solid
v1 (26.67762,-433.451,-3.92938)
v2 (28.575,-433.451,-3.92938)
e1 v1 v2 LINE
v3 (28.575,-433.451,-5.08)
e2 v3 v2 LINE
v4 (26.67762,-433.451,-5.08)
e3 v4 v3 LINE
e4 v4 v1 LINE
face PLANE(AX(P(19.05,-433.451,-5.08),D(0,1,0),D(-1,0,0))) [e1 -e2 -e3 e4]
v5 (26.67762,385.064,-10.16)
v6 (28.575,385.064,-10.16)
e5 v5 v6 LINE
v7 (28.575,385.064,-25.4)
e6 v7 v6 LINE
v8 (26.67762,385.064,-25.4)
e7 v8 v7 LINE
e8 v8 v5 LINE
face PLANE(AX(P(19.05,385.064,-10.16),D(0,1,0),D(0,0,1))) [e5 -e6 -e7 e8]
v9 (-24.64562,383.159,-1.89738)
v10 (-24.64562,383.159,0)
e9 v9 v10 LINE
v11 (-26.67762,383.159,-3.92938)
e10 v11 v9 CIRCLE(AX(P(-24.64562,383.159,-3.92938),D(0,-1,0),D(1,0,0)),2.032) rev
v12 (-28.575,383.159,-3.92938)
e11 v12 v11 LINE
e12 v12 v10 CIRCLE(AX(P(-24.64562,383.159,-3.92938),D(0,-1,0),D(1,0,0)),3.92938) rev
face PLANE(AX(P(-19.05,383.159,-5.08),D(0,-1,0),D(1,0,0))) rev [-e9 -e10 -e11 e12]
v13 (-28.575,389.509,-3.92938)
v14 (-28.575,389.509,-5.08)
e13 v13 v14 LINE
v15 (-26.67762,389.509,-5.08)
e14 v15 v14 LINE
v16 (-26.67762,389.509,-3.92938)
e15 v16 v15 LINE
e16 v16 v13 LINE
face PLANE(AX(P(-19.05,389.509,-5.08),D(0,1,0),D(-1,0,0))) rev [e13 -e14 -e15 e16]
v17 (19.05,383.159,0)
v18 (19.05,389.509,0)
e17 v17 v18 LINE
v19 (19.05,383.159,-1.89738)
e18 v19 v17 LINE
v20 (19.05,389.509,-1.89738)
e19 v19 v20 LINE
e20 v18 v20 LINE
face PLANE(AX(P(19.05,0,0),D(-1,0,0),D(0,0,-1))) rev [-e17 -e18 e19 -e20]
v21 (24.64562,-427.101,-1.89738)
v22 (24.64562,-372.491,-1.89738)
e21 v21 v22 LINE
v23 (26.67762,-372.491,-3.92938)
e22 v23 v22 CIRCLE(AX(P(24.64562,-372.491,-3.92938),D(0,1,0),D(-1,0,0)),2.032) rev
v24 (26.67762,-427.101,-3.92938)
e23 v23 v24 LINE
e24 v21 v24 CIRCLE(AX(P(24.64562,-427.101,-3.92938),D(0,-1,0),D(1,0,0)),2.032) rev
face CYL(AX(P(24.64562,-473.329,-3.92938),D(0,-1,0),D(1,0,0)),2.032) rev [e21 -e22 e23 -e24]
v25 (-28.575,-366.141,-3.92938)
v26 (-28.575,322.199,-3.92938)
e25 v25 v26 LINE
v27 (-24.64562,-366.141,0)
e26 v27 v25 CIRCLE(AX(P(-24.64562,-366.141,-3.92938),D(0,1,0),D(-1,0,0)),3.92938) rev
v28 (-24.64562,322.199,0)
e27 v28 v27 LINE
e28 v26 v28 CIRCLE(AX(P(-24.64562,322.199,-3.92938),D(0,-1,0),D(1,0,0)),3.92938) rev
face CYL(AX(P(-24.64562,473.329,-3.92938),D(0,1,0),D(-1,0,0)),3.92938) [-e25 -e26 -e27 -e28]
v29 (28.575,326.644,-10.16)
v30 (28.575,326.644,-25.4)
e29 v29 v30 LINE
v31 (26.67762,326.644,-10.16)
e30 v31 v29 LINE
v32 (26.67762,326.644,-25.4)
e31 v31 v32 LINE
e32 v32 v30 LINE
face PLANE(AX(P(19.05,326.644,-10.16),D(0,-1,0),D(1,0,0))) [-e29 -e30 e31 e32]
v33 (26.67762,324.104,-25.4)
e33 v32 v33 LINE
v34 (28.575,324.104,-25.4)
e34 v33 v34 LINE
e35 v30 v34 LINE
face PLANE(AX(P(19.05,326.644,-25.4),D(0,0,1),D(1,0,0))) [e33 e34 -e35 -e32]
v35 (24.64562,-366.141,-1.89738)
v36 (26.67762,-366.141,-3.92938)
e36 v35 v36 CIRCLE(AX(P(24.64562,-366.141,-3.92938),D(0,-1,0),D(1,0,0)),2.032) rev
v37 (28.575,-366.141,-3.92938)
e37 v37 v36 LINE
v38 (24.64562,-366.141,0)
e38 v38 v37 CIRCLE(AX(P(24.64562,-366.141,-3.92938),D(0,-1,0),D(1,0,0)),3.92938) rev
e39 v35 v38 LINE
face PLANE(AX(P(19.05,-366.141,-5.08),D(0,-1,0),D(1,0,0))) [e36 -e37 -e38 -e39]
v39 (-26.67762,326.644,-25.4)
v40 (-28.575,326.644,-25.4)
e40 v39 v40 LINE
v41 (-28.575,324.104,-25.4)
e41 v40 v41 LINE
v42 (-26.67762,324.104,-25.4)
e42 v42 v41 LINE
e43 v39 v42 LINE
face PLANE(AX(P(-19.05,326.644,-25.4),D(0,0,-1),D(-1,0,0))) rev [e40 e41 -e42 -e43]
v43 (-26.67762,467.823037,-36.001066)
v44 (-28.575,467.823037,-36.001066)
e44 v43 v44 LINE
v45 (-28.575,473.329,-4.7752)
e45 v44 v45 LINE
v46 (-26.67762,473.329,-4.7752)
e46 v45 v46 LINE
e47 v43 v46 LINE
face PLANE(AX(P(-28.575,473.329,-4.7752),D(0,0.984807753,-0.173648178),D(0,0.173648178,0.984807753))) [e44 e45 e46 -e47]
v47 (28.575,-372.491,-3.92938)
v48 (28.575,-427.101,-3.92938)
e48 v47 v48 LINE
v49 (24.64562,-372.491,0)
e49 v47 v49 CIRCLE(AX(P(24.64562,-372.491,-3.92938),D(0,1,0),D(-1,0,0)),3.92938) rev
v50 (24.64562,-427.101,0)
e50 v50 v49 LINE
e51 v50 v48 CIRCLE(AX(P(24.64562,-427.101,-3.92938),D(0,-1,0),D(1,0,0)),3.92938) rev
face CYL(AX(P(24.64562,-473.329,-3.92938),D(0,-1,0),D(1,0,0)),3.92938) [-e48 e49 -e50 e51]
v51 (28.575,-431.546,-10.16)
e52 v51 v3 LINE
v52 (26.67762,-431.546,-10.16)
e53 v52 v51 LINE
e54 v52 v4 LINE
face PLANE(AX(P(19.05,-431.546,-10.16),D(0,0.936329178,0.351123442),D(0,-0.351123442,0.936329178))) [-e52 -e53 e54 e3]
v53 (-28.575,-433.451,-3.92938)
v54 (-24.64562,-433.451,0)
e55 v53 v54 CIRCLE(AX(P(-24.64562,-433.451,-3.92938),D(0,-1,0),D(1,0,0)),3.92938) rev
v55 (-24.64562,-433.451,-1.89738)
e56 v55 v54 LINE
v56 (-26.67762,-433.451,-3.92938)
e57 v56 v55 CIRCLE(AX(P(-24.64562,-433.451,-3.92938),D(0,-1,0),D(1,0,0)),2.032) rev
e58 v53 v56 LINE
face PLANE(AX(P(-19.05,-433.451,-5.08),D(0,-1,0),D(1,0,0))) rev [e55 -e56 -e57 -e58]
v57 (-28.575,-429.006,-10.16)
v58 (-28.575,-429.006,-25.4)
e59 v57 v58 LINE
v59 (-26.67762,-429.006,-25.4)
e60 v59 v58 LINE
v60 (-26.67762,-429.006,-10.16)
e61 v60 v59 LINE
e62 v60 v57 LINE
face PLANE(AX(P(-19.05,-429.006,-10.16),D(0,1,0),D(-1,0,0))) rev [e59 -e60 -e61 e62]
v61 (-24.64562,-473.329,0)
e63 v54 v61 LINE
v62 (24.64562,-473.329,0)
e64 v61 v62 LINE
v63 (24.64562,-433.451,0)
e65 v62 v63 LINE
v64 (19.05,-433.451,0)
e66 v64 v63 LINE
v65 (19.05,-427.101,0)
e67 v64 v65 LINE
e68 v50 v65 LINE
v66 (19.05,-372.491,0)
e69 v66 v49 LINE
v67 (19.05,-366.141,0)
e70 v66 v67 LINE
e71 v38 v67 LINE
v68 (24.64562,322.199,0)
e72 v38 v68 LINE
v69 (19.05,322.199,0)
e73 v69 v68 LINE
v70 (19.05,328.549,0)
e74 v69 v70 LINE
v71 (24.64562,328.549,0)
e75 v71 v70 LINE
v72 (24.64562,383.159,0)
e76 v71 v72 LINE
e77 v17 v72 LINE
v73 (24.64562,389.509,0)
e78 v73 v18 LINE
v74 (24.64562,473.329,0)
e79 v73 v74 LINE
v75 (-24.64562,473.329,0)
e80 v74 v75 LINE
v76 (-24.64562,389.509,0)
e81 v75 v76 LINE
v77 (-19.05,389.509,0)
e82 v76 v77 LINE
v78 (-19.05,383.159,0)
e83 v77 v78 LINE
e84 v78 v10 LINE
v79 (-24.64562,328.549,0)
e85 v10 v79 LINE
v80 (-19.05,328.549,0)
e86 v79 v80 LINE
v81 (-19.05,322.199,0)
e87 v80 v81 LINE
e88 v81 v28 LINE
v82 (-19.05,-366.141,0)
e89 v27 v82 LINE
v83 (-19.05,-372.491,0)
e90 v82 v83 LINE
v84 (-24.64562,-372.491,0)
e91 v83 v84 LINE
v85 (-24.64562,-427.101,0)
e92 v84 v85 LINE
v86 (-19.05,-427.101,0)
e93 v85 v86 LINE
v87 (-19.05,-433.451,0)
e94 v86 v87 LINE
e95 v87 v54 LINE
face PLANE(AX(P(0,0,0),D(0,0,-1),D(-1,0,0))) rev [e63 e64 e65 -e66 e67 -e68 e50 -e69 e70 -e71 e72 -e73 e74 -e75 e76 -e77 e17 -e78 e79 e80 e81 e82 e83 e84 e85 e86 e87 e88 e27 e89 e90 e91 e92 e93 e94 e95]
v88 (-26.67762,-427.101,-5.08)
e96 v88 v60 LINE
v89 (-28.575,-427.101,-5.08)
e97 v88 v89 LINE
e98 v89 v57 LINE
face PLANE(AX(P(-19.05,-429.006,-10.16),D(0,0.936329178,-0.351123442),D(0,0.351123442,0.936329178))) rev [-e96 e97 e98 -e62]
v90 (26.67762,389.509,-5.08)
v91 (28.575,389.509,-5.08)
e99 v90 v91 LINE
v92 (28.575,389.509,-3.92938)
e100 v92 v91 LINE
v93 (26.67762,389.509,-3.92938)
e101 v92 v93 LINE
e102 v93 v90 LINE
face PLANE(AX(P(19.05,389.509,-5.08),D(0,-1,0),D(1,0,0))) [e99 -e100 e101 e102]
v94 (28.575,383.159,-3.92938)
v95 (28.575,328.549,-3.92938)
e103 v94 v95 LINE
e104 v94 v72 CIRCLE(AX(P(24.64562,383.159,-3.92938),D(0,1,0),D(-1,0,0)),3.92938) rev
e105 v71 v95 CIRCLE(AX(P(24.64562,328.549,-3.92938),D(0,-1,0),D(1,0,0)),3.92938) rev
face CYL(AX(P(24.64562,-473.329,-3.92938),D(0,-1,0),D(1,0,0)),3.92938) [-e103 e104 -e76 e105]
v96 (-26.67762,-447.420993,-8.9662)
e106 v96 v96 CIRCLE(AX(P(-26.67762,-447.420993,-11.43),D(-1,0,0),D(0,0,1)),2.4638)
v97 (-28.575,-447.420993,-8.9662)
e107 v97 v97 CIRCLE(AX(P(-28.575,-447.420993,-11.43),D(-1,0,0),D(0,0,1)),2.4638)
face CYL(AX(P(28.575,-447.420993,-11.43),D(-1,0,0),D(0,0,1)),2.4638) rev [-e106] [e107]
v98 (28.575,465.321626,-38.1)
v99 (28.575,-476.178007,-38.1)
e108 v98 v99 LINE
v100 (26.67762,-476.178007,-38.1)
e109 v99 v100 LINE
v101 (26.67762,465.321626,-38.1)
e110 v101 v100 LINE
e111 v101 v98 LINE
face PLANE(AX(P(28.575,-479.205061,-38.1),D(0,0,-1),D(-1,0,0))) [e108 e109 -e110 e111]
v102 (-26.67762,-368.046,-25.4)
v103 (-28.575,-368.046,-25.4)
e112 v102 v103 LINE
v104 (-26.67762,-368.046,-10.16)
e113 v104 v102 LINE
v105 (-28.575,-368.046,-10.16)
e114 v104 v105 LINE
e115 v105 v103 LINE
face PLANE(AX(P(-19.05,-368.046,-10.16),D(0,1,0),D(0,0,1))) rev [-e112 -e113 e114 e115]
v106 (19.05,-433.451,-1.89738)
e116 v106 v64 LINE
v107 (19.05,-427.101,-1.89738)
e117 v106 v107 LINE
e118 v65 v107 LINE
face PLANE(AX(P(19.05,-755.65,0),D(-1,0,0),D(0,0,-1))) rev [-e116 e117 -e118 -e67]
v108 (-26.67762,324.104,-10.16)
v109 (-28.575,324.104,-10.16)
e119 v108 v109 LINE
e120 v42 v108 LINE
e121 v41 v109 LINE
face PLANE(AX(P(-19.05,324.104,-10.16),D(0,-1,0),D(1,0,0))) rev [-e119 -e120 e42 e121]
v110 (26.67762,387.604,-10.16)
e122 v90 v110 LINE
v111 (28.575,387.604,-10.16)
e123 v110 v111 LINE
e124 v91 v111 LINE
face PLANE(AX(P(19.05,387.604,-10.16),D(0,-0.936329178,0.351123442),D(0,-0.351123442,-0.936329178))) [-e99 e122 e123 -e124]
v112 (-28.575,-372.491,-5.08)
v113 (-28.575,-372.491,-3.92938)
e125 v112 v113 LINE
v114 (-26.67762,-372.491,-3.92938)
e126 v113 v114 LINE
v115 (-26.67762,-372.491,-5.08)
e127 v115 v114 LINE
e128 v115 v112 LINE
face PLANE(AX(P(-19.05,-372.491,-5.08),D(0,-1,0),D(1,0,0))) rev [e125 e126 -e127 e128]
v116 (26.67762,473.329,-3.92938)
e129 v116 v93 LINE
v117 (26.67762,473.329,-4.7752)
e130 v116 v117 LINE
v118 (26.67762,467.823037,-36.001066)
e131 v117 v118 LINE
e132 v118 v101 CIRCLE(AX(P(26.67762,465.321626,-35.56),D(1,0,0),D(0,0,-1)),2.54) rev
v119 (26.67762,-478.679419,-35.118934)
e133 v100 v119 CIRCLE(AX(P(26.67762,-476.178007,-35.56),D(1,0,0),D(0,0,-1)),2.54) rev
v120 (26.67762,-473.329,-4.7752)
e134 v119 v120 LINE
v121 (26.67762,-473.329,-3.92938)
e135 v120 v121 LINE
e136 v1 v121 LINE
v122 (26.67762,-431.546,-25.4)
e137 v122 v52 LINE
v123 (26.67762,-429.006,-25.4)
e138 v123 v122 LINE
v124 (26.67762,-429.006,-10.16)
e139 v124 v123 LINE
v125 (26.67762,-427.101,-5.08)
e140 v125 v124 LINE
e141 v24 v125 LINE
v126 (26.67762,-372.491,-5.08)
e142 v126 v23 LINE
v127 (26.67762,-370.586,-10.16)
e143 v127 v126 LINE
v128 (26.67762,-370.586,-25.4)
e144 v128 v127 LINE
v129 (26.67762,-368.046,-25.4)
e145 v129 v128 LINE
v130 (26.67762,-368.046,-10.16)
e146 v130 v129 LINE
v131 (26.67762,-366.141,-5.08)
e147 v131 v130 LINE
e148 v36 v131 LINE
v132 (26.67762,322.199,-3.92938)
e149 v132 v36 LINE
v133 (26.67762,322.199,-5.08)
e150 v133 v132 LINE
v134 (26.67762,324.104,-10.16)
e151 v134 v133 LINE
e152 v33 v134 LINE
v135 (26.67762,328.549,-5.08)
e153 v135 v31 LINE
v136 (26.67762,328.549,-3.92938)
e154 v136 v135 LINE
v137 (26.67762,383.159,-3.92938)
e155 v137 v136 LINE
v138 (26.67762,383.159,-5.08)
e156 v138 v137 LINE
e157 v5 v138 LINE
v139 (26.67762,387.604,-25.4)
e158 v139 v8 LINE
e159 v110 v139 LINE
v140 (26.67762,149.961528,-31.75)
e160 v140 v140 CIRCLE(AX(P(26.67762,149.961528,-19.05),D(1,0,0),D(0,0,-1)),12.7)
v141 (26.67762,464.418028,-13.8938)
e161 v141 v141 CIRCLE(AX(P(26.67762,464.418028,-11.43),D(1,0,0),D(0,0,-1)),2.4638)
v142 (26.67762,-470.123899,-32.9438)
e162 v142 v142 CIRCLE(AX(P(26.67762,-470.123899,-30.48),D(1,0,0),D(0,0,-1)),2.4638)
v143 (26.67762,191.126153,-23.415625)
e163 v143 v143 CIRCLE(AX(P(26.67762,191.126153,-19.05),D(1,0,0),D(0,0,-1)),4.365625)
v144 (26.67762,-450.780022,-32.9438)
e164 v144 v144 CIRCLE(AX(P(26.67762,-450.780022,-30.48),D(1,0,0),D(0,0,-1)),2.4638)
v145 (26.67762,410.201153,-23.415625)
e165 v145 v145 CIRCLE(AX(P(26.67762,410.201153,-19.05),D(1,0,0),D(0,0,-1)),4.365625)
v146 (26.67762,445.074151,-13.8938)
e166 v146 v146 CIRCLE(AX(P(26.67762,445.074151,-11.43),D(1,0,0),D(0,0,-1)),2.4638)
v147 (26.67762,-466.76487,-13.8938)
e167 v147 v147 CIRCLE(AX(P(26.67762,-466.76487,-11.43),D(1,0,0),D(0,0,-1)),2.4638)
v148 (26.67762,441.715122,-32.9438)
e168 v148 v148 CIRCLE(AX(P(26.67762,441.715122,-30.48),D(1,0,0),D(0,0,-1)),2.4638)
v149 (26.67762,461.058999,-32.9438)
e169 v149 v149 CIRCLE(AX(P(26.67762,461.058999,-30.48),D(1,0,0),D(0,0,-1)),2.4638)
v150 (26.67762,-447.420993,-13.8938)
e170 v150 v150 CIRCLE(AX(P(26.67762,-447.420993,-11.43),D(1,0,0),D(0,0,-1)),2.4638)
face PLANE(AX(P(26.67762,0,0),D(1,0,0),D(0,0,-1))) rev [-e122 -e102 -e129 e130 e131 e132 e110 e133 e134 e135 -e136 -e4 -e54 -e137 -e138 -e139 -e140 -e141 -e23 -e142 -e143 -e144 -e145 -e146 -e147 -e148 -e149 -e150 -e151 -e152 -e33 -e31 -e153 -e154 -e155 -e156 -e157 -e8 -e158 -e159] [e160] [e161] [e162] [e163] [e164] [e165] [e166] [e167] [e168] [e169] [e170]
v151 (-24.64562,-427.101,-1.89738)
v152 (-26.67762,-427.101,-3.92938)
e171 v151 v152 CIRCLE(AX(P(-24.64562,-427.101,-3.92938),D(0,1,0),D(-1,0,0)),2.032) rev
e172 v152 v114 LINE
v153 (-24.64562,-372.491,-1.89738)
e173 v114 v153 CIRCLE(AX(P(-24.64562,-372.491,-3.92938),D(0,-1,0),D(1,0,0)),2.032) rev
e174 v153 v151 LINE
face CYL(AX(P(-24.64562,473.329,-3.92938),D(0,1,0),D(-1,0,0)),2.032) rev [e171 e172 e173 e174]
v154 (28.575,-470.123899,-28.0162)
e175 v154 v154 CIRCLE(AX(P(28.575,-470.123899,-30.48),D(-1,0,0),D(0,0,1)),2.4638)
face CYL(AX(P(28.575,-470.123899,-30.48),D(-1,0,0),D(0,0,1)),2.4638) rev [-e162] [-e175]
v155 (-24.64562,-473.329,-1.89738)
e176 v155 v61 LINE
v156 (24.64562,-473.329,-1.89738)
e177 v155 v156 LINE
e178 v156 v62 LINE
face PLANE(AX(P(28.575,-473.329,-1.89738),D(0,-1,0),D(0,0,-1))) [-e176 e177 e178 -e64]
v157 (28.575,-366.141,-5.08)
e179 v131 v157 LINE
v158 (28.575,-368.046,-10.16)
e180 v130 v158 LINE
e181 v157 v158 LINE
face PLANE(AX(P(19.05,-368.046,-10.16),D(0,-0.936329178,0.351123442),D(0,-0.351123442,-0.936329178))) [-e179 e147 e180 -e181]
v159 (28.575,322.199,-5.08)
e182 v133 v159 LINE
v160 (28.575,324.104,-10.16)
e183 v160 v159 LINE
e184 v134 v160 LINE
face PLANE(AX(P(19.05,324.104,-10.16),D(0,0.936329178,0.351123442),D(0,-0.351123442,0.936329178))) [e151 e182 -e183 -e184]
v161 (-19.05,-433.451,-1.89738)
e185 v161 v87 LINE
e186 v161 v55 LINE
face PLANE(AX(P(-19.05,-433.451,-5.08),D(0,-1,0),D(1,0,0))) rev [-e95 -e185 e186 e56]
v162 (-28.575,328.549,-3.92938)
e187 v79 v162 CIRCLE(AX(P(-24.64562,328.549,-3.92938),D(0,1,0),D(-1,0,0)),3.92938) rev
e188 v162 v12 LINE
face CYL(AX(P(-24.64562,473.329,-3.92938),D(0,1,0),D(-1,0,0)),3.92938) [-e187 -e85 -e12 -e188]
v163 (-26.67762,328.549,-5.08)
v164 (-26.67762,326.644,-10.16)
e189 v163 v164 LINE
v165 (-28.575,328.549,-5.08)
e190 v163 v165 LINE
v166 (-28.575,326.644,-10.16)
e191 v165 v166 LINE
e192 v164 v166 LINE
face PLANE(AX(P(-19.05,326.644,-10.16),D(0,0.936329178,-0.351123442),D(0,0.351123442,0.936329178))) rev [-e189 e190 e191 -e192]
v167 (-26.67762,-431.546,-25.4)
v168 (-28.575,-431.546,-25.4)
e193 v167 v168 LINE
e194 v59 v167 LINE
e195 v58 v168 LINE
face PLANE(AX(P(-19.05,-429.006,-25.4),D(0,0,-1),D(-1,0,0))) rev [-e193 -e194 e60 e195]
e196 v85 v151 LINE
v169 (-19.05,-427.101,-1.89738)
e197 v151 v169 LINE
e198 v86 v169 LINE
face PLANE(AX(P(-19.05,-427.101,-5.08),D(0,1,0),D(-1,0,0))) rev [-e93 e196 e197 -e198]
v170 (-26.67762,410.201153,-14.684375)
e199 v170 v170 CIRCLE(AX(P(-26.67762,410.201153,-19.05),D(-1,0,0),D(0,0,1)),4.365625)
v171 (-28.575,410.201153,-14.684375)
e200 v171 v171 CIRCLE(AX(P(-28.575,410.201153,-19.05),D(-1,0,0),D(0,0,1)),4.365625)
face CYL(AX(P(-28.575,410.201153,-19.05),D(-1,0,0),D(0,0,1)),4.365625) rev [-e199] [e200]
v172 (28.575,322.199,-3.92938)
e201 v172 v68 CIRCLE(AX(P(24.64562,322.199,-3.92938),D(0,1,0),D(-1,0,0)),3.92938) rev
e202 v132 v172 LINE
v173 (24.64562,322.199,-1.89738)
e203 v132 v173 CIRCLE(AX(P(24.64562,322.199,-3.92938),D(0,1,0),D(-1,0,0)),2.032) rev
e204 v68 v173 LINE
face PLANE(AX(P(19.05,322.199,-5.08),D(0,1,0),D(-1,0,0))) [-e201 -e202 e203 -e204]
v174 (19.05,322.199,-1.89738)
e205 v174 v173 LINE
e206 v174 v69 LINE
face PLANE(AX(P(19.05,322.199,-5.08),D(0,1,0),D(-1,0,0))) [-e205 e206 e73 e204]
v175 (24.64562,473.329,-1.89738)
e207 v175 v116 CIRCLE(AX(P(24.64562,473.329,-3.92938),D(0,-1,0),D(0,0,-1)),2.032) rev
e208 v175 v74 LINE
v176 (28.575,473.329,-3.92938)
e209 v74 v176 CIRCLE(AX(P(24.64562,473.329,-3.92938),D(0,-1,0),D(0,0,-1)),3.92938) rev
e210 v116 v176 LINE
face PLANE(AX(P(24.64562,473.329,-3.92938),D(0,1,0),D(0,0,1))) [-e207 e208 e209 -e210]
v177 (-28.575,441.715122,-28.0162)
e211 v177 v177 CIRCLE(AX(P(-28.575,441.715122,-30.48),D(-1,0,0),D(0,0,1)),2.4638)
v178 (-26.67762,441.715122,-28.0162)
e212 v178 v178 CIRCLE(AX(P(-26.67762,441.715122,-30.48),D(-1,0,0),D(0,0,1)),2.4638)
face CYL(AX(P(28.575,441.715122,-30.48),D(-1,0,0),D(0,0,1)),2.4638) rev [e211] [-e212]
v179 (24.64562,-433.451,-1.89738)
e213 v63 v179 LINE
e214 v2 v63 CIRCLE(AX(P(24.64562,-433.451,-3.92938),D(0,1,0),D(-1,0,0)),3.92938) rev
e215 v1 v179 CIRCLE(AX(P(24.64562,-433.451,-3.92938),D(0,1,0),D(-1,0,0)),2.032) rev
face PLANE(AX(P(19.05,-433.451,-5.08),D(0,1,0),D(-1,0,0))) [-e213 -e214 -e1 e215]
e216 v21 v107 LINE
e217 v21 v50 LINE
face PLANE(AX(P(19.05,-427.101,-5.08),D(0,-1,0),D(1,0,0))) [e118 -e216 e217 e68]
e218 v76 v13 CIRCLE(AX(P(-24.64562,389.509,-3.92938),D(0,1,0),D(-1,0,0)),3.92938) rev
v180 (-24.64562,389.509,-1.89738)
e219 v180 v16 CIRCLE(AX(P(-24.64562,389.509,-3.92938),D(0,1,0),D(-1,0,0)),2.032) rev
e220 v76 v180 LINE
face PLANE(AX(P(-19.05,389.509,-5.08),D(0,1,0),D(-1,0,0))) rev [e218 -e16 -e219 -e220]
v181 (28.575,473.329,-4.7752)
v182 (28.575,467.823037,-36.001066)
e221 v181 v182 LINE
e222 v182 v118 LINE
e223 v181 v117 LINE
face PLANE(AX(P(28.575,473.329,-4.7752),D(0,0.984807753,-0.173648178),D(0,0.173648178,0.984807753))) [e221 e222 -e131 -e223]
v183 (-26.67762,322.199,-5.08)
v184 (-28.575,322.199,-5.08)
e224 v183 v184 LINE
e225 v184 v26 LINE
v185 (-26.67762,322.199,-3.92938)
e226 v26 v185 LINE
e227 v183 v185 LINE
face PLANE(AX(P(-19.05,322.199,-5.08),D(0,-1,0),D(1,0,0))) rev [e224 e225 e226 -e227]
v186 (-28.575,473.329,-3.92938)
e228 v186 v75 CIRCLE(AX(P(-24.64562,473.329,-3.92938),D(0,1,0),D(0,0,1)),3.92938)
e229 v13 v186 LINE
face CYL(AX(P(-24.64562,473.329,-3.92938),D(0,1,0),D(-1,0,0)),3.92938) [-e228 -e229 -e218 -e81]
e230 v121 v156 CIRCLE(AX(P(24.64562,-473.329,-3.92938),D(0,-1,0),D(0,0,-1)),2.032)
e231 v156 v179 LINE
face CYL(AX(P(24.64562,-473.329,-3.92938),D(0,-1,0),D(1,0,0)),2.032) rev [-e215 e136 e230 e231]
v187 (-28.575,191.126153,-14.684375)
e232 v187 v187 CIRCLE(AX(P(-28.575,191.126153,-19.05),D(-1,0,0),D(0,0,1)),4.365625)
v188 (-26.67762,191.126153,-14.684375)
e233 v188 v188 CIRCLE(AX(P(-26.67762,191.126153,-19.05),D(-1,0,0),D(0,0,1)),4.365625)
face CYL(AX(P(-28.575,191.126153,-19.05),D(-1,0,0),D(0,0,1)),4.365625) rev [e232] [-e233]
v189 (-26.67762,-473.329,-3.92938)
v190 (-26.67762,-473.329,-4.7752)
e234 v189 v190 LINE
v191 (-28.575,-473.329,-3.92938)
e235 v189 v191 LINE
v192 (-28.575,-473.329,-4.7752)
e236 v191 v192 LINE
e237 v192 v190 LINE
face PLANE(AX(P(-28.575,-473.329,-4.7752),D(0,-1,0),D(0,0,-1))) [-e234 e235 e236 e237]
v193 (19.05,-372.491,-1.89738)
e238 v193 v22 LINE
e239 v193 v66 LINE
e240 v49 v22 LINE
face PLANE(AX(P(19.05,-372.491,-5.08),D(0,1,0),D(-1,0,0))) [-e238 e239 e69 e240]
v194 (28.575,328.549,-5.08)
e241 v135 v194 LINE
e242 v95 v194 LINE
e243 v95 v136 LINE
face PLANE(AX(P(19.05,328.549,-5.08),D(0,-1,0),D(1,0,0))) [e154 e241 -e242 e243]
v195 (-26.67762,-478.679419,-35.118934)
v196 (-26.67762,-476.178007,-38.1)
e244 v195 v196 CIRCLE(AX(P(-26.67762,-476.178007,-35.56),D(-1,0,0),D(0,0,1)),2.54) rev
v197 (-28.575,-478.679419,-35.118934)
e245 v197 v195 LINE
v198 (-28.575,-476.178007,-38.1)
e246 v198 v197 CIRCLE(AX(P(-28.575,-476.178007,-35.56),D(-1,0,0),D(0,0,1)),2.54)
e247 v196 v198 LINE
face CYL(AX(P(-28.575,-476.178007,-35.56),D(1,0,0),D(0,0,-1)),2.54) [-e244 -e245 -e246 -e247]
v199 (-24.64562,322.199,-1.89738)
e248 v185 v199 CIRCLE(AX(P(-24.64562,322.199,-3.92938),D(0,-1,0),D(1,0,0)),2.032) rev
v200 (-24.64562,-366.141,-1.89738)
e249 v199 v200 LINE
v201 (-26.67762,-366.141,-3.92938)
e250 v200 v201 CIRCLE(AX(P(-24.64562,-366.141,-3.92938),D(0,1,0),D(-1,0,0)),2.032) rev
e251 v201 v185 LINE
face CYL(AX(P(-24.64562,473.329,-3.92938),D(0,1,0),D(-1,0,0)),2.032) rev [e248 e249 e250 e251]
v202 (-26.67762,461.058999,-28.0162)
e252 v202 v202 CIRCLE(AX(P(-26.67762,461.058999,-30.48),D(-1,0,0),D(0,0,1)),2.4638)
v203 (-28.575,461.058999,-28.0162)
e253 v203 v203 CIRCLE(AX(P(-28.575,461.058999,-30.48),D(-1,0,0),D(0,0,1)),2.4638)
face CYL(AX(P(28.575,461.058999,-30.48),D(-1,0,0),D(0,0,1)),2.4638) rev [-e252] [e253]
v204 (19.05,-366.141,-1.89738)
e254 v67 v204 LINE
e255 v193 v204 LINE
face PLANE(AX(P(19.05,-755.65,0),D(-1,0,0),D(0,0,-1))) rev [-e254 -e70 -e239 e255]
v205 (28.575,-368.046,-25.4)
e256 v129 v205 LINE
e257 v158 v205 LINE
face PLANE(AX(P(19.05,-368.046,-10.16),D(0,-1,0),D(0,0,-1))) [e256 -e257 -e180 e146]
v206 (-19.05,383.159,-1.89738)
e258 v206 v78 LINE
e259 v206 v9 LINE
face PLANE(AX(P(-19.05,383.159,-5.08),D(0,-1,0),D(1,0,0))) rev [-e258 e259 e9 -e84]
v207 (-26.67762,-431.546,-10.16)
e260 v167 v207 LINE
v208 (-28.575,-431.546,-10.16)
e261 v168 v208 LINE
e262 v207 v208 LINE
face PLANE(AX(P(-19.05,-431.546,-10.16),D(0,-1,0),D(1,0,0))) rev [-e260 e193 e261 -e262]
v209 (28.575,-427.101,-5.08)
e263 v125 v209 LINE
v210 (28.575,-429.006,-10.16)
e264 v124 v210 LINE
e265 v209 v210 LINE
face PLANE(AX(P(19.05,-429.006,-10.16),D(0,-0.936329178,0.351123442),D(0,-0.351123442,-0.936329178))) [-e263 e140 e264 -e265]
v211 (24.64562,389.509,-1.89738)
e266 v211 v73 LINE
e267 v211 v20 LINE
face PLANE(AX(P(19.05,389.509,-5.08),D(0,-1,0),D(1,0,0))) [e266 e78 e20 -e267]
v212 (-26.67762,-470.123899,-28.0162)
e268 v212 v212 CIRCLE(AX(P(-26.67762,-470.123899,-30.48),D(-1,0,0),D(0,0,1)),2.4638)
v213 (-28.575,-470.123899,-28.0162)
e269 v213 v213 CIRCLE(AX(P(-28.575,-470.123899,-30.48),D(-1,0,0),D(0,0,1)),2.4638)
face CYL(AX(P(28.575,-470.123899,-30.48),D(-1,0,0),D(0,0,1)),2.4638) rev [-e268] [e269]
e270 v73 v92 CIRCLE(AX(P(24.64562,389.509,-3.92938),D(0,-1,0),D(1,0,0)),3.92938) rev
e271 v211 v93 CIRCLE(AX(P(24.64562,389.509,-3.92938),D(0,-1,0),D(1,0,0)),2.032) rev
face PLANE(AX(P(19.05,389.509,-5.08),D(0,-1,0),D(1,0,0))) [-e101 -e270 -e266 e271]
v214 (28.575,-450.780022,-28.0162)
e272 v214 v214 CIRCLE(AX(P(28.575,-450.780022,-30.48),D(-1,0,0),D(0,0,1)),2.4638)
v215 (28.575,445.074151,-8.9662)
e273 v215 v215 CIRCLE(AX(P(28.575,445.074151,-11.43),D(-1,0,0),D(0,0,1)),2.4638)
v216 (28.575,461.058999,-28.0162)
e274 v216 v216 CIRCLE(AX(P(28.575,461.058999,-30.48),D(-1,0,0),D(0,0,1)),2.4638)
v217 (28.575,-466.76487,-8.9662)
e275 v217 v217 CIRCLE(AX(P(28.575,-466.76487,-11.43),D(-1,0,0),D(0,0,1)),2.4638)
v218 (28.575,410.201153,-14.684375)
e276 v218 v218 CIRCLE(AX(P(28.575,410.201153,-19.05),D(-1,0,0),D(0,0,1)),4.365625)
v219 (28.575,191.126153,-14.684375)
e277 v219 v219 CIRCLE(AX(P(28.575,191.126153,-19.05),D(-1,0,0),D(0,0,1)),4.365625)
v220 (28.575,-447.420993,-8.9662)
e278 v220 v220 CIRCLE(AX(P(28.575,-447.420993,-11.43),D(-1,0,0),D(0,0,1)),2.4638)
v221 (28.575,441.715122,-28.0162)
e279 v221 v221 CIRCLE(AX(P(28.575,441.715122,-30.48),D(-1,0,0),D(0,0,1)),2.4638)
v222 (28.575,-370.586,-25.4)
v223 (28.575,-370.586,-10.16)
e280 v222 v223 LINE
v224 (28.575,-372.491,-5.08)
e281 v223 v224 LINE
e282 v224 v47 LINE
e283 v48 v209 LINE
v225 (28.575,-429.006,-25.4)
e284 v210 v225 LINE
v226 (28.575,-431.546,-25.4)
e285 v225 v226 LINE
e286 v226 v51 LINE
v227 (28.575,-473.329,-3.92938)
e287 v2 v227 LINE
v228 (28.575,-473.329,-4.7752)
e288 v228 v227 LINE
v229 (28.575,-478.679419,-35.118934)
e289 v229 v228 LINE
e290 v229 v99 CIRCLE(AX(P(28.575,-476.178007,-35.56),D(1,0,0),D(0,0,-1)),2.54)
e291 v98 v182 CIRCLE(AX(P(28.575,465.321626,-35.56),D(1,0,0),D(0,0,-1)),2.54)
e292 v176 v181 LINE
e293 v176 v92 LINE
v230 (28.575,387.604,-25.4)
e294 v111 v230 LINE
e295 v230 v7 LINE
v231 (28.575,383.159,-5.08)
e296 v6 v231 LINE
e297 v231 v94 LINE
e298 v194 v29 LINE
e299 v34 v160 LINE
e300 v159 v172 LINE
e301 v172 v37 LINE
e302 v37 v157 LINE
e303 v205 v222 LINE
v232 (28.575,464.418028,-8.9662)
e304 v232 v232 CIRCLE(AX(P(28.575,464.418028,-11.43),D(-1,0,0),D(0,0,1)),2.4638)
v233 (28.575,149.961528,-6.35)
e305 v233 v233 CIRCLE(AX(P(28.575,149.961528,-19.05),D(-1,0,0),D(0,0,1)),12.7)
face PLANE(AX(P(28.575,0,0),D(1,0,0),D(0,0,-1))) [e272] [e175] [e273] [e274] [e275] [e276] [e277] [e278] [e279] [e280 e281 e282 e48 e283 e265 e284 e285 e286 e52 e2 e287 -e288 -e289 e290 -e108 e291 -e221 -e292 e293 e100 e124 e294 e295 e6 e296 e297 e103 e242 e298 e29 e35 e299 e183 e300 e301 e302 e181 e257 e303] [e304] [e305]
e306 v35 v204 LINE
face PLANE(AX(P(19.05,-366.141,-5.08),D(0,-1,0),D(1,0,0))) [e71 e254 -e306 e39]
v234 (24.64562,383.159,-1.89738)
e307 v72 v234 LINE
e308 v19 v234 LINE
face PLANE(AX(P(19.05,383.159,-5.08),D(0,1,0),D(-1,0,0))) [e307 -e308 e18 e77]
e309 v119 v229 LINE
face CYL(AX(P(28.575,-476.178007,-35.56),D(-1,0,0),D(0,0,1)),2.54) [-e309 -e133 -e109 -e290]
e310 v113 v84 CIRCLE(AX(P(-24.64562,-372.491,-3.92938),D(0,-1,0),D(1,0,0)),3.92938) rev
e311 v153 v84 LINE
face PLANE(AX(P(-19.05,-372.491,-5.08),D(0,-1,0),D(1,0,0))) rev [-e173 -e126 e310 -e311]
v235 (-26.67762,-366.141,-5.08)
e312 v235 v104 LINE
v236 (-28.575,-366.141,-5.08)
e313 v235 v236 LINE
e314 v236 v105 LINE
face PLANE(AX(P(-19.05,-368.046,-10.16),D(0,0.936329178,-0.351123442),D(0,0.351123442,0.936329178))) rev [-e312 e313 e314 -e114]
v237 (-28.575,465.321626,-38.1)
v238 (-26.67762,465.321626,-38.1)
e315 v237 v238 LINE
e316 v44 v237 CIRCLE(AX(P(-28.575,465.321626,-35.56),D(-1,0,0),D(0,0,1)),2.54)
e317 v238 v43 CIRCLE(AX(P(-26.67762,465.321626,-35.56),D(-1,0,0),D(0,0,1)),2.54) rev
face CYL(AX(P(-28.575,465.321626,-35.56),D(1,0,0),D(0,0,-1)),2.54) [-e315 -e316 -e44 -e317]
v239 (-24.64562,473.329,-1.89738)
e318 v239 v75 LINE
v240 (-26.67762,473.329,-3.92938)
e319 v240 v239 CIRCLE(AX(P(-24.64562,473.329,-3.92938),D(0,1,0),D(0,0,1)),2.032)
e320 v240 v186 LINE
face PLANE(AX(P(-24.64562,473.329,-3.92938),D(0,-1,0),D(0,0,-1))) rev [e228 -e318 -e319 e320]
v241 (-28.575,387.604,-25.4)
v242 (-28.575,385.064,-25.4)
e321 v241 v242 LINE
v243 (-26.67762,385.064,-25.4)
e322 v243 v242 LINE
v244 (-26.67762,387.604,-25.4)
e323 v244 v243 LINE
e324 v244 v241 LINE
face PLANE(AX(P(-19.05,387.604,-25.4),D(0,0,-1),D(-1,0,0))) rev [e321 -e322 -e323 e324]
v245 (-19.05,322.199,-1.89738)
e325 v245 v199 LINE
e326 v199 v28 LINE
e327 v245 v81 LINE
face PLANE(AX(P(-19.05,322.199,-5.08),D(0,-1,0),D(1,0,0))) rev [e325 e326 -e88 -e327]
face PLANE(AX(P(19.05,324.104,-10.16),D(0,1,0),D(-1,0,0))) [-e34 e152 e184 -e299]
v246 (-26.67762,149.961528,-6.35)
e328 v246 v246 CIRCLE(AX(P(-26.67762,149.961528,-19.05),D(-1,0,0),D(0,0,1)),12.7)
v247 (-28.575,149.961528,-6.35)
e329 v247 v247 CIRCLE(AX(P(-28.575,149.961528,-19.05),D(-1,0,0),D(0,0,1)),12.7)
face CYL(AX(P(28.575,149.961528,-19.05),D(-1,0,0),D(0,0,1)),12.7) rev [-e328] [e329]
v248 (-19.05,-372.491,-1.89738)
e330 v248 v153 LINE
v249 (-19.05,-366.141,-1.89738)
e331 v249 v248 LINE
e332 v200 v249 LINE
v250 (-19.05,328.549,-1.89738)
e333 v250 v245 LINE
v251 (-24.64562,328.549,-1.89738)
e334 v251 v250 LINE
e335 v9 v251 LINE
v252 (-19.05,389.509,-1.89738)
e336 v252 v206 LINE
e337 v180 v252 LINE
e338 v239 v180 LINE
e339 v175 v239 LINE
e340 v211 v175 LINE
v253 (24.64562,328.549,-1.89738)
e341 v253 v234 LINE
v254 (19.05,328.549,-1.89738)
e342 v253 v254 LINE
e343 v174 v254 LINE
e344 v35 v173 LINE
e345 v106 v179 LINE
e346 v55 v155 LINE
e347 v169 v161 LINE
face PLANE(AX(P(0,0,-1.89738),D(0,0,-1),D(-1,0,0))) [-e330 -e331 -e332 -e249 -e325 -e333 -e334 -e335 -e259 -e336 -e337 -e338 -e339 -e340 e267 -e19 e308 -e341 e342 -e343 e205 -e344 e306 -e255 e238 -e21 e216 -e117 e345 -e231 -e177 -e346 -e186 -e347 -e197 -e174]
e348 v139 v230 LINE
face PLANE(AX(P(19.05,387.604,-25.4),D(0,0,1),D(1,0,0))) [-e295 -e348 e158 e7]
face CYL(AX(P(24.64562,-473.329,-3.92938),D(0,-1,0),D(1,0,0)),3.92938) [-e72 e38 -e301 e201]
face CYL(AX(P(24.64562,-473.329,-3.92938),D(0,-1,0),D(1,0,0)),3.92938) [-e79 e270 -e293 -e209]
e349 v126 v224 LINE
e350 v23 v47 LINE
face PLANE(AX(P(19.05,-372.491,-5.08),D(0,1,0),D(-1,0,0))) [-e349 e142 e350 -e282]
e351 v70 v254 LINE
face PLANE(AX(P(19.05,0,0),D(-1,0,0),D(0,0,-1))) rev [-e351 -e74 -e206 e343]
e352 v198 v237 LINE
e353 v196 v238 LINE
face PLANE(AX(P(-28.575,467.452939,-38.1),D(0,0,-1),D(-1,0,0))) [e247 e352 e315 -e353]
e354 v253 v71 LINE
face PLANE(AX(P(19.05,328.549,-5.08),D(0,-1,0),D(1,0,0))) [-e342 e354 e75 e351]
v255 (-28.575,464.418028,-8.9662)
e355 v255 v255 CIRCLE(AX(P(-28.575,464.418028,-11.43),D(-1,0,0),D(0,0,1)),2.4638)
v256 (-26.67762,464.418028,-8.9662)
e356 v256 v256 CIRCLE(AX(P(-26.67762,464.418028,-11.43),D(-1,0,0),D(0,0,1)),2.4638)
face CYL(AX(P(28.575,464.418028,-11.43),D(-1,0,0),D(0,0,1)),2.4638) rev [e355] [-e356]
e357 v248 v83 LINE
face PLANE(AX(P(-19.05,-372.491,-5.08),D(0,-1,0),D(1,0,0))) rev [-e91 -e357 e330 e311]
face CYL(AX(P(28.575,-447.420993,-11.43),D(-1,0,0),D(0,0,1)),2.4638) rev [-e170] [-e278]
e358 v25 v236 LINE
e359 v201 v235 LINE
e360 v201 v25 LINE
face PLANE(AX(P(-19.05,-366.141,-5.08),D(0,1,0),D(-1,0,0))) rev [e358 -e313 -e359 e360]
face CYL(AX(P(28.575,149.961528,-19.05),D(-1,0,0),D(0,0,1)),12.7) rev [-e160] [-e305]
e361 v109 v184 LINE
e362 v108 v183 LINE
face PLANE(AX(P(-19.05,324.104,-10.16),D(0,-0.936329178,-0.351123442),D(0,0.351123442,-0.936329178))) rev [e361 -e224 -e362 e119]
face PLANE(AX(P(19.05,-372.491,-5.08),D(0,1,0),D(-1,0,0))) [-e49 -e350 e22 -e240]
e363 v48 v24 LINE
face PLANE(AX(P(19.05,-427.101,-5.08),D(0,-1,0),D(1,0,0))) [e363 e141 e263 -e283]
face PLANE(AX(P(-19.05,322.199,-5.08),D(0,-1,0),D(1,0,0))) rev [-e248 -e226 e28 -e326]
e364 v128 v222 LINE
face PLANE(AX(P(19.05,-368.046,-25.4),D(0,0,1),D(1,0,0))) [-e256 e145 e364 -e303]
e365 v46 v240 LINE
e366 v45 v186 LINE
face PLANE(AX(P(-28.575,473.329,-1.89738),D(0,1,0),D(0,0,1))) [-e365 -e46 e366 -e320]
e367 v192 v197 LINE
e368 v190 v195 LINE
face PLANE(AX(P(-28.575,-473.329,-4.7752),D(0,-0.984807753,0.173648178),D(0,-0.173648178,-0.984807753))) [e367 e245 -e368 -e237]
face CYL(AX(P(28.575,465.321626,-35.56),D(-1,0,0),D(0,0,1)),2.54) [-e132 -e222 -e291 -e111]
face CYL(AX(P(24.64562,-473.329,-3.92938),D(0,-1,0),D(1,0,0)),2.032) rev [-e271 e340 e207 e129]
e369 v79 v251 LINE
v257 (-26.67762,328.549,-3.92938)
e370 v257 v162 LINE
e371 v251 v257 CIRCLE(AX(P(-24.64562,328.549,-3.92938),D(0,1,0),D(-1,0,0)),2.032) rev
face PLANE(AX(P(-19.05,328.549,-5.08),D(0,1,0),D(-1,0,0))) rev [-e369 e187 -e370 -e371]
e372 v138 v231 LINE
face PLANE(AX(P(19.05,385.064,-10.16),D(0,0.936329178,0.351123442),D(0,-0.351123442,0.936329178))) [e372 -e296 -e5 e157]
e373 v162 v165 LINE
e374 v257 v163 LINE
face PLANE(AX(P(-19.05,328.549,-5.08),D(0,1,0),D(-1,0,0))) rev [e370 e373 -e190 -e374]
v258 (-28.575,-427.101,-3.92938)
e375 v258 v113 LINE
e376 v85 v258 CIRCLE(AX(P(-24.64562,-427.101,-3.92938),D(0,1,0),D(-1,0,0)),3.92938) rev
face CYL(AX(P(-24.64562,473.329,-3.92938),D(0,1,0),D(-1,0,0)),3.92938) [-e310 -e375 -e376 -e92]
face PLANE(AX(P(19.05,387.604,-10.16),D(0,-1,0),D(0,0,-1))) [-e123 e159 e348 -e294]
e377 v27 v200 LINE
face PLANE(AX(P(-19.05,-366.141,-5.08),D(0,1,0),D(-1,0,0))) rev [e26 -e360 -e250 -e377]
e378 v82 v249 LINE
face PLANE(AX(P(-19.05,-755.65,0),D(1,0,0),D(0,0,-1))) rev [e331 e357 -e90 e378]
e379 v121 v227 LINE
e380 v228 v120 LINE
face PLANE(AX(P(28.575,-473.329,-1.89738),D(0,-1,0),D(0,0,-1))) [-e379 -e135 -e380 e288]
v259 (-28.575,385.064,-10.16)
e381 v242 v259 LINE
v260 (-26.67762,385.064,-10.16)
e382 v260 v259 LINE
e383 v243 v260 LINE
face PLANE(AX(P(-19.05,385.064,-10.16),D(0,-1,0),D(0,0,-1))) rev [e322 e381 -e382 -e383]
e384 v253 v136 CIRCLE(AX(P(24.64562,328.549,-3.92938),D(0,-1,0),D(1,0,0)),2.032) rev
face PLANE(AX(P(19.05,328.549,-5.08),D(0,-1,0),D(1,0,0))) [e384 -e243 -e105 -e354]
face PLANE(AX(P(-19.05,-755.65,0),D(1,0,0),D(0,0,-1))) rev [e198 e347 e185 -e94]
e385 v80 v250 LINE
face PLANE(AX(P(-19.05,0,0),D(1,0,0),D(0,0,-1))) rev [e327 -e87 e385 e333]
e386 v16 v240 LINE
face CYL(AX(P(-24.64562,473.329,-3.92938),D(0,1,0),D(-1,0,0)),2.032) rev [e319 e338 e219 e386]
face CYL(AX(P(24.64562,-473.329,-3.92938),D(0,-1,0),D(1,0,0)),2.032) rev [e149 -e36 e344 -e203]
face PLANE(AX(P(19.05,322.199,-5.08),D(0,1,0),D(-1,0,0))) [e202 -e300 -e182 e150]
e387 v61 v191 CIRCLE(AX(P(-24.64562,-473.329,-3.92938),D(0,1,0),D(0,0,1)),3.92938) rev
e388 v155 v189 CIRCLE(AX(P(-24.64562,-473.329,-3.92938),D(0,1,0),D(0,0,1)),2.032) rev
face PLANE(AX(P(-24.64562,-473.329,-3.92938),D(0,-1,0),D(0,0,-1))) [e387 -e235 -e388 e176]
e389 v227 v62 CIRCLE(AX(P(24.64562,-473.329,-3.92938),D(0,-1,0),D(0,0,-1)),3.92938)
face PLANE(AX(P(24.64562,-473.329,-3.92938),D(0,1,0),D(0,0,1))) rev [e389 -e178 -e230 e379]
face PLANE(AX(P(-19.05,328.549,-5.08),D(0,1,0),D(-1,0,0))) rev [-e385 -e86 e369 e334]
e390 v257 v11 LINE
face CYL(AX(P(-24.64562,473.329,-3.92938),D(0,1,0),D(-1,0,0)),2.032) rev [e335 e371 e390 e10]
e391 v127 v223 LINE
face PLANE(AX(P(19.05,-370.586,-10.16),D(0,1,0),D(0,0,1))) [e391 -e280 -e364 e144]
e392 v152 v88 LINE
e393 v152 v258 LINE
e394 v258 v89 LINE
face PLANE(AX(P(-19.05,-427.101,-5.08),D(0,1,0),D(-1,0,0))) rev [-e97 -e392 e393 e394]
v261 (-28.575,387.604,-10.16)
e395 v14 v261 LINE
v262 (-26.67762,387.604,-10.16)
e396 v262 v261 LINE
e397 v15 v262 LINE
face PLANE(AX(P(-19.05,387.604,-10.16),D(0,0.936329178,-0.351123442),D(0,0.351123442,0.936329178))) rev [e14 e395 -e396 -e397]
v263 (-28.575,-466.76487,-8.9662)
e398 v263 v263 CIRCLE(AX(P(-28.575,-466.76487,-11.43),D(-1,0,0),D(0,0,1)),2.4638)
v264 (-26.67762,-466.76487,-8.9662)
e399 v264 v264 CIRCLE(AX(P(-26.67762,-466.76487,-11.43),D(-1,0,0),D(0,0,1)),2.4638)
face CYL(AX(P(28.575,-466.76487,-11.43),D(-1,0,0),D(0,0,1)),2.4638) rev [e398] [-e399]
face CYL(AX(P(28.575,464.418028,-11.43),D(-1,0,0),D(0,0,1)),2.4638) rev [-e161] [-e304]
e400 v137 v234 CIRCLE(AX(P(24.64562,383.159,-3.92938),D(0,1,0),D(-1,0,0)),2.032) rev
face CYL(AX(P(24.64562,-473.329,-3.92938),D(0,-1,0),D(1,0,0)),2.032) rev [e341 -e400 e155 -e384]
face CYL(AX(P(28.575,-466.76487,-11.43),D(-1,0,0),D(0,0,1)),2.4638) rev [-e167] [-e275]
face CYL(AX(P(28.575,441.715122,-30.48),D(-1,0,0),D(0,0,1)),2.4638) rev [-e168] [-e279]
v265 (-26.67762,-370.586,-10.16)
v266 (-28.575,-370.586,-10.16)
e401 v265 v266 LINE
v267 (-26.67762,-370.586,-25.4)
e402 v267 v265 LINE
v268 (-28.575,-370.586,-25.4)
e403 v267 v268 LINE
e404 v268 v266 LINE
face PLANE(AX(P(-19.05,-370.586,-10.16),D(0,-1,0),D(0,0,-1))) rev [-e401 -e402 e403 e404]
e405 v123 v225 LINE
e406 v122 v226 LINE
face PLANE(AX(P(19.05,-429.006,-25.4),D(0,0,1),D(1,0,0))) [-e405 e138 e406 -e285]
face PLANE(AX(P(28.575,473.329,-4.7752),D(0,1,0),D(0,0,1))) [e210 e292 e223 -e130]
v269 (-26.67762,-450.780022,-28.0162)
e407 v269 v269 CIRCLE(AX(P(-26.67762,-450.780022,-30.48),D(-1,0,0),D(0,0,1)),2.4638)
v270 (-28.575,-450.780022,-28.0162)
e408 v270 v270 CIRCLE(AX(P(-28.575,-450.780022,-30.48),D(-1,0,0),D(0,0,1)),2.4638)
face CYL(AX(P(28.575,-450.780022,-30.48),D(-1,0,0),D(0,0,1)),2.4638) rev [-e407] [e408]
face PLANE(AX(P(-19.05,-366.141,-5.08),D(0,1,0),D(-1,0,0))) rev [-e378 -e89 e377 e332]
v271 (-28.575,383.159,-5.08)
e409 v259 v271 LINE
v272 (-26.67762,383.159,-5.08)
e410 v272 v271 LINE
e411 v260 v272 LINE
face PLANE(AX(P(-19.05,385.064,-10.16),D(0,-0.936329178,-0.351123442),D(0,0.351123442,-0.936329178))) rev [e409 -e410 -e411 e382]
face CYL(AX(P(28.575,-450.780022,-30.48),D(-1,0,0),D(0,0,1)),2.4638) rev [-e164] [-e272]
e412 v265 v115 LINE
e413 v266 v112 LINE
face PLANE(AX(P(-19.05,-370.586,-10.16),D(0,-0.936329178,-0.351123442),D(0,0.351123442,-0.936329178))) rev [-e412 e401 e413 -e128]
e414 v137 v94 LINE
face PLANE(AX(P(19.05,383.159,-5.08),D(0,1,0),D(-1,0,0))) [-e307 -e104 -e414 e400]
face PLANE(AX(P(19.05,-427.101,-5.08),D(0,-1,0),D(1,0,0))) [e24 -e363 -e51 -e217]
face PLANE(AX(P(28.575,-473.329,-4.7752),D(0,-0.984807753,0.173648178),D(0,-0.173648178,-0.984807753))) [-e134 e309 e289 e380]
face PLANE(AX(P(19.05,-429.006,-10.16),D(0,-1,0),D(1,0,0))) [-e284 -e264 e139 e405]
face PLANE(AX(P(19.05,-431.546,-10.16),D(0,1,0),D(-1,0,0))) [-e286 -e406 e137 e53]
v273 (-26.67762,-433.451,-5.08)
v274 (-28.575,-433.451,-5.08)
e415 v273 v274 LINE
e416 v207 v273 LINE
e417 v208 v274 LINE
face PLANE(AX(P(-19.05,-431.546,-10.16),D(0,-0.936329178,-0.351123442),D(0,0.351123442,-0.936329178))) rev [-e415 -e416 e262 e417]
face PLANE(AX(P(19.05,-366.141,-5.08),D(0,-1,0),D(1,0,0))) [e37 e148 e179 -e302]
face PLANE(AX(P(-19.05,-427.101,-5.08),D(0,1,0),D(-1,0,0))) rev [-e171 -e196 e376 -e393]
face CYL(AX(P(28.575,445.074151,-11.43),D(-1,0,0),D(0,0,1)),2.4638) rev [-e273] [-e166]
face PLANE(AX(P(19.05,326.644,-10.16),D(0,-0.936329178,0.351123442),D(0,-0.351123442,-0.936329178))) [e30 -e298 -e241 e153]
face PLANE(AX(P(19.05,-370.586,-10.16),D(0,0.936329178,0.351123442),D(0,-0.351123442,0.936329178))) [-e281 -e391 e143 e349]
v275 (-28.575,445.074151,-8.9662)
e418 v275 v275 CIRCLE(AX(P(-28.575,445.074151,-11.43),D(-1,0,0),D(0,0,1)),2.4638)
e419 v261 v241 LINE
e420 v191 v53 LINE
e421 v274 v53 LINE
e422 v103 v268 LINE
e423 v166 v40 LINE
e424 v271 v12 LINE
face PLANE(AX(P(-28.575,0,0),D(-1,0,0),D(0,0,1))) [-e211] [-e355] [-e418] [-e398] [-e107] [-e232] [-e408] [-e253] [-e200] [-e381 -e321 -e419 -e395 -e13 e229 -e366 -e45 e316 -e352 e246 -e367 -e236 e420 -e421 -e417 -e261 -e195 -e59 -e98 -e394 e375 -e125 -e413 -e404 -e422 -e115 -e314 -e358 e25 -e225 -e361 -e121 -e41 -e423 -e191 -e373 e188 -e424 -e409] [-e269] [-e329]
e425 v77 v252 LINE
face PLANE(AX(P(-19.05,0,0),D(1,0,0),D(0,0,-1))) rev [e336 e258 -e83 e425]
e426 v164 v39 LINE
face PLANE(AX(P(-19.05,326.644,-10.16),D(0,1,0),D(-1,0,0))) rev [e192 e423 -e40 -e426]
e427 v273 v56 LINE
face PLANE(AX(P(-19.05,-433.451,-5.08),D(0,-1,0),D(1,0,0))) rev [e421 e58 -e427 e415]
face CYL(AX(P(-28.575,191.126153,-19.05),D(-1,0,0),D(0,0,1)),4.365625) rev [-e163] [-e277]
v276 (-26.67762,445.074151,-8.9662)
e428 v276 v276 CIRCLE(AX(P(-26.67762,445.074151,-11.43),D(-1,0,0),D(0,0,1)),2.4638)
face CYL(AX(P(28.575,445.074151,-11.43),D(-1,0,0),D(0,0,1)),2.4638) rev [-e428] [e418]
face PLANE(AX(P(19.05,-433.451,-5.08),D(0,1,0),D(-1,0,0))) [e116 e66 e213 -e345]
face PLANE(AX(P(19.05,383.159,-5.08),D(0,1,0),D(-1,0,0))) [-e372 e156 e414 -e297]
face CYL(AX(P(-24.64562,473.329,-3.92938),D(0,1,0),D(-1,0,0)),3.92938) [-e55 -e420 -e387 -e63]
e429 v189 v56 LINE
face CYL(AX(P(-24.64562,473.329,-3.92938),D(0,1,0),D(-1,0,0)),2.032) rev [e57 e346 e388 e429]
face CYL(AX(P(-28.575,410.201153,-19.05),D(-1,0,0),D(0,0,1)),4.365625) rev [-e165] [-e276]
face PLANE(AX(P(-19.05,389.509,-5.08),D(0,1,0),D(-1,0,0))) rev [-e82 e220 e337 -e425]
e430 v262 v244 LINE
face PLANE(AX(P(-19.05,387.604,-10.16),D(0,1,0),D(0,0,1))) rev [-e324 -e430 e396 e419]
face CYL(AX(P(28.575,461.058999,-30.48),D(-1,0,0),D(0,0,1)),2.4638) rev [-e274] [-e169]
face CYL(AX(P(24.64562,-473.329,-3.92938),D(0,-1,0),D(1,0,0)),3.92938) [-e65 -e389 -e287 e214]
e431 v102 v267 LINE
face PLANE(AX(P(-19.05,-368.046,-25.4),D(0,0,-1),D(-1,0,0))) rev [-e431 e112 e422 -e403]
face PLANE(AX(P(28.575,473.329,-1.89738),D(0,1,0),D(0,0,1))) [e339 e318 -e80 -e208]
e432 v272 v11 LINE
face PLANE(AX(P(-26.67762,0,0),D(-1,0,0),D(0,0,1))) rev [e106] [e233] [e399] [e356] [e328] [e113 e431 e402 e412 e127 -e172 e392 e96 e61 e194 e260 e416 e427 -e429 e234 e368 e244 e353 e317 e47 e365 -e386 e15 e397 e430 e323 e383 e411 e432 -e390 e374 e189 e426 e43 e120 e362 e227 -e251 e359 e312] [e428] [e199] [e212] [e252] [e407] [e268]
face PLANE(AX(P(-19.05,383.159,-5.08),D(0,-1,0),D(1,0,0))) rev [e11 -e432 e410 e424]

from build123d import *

# Parameters (mm, degrees)
SKETCH1_W                        = 57.15
SKETCH1_H                        = 946.658
BASE_FLANGE1_DEPTH               = 1.89738
EDGE_FLANGE1_STRIP_W             = 11.65352
EDGE_FLANGE1_STRIP_H             = 1.89738
EDGE_FLANGE1_STRIP_CUT_DEPTH     = 946.658
EDGE_FLANGE1_DEPTH               = 946.658
EDGE_FLANGE1_FLAT_DEPTH          = 1.89738
EDGE_FLANGE2_STRIP_W             = 11.65352
EDGE_FLANGE2_STRIP_H             = 1.89738
EDGE_FLANGE2_STRIP_CUT_DEPTH     = 946.658
EDGE_FLANGE2_DEPTH               = 946.658
EDGE_FLANGE2_FLAT_DEPTH          = 1.89738
FILLET1_R                        = 2.54
SKETCH12_R                       = 2.4638
CUT_EXTRUDE1_DEPTH               = 484.620370701
SKETCH13_R                       = 2.4638
CUT_EXTRUDE2_DEPTH               = 484.620370701
CUT_EXTRUDE3_DEPTH               = 9.525
LPATTERN1_COUNT                  = 2
LPATTERN1_PITCH                  = 755.65
MIRROR1_COPY_1_DEPTH             = 9.525
SKETCH15_R                       = 12.7
CUT_EXTRUDE4_DEPTH               = 484.620370701
F_11_32_0_34375_DIAMETER_HOLE1_D = 8.73125


# Sheet-metal steps are written as plain solids
with BuildPart() as part:
    # Sketch1 → Base-Flange1 (new body)
    with BuildSketch(Plane.XY):
        Rectangle(SKETCH1_W, SKETCH1_H)
    extrude(amount=-BASE_FLANGE1_DEPTH)

    # Edge-Flange1 strip (across the edge) → Edge-Flange1 strip cut (cut)
    with BuildSketch(Plane(origin=(28.575, 473.329, -1.89738), x_dir=(-1, 0, 0), z_dir=(0, -1, 0))):
        with Locations((-1.89738, -0.94869)):
            Rectangle(EDGE_FLANGE1_STRIP_W, EDGE_FLANGE1_STRIP_H)
    extrude(amount=EDGE_FLANGE1_STRIP_CUT_DEPTH, mode=Mode.SUBTRACT)

    # Edge-Flange1 bend section (across the edge) → Edge-Flange1 (add)
    with BuildSketch(Plane(origin=(28.575, 473.329, -1.89738), x_dir=(-1, 0, 0), z_dir=(0, -1, 0))):
        with BuildLine():
            Line((0, 2.032), (1.89738, 2.032))
            ThreePointArc((1.89738, 2.032), (2.492539021, 0.595159021), (3.92938, 0))
            Line((3.92938, 0), (3.92938, -1.89738))
            ThreePointArc((3.92938, -1.89738), (1.150888756, -0.746491244), (0, 2.032))
        make_face()
    extrude(amount=EDGE_FLANGE1_DEPTH)

    # Edge-Flange1 profile (on flange) → Edge-Flange1 flat (add)
    with BuildSketch(Plane(origin=(28.575, 0, -1.89738), x_dir=(0, 1, 0), z_dir=(-1, 0, 0))):
        Polygon((473.329, 2.032), (473.329, 2.87782), (467.452938633, 36.20262), (-479.205061367, 36.20262), (-473.329, 2.87782), (-473.329, 2.032), align=None)
    extrude(amount=EDGE_FLANGE1_FLAT_DEPTH)

    # Edge-Flange2 strip (across the edge) → Edge-Flange2 strip cut (cut)
    with BuildSketch(Plane(origin=(-28.575, -473.329, -1.89738), x_dir=(1, 0, 0), z_dir=(0, 1, 0))):
        with Locations((-1.89738, -0.94869)):
            Rectangle(EDGE_FLANGE2_STRIP_W, EDGE_FLANGE2_STRIP_H)
    extrude(amount=EDGE_FLANGE2_STRIP_CUT_DEPTH, mode=Mode.SUBTRACT)

    # Edge-Flange2 bend section (across the edge) → Edge-Flange2 (add)
    with BuildSketch(Plane(origin=(-28.575, -473.329, -1.89738), x_dir=(1, 0, 0), z_dir=(0, 1, 0))):
        with BuildLine():
            Line((0, 2.032), (1.89738, 2.032))
            ThreePointArc((1.89738, 2.032), (2.492539021, 0.595159021), (3.92938, 0))
            Line((3.92938, 0), (3.92938, -1.89738))
            ThreePointArc((3.92938, -1.89738), (1.150888756, -0.746491244), (0, 2.032))
        make_face()
    extrude(amount=EDGE_FLANGE2_DEPTH)

    # Edge-Flange2 profile (on flange) → Edge-Flange2 flat (add)
    with BuildSketch(Plane(origin=(-28.575, 0, -1.89738), x_dir=(0, -1, 0), z_dir=(1, 0, 0))):
        Polygon((-473.329, 2.87782), (-473.329, 2.032), (473.329, 2.032), (473.329, 2.87782), (479.205061367, 36.20262), (-467.452938633, 36.20262), align=None)
    extrude(amount=EDGE_FLANGE2_FLAT_DEPTH)

    # Fillet1
    fillet1_edges = [part.edges().sort_by_distance(p)[0] for p in [
        (27.62631, -479.205061367, -38.1),
        (27.62631, 467.452938633, -38.1),
        (-27.62631, 467.452938633, -38.1),
        (-27.62631, -479.205061367, -38.1),
    ]]
    fillet(fillet1_edges, radius=FILLET1_R)

    # Sketch12 → Cut-Extrude1 (cut, through all)
    with BuildSketch(Plane.ZY.offset(28.575)):
        with Locations((-30.48, -470.123898991)):
            Circle(SKETCH12_R)
        with Locations((-30.48, -450.780022035)):
            Circle(SKETCH12_R)
        with Locations((-11.43, -447.420993052)):
            Circle(SKETCH12_R)
        with Locations((-11.43, -466.764870009)):
            Circle(SKETCH12_R)
    extrude(amount=-CUT_EXTRUDE1_DEPTH, mode=Mode.SUBTRACT)

    # Sketch13 → Cut-Extrude2 (cut, through all)
    with BuildSketch(Plane.ZY.offset(28.575)):
        with Locations((-30.48, 461.058999444)):
            Circle(SKETCH13_R)
        with Locations((-11.43, 464.418028426)):
            Circle(SKETCH13_R)
        with Locations((-11.43, 445.07415147)):
            Circle(SKETCH13_R)
        with Locations((-30.48, 441.715122487)):
            Circle(SKETCH13_R)
    extrude(amount=-CUT_EXTRUDE2_DEPTH, mode=Mode.SUBTRACT)

    # Sketch14 → Cut-Extrude3 (cut)
    with BuildSketch(Plane.ZY.offset(28.575)):
        Polygon((3.175, 389.509), (3.175, 383.159), (-5.08, 383.159), (-10.16, 385.064), (-25.4, 385.064), (-25.4, 387.604), (-10.16, 387.604), (-5.08, 389.509), align=None)
        Polygon((3.175, 328.549), (3.175, 322.199), (-5.08, 322.199), (-10.16, 324.104), (-25.4, 324.104), (-25.4, 326.644), (-10.16, 326.644), (-5.08, 328.549), align=None)
    cut_extrude3 = extrude(amount=-CUT_EXTRUDE3_DEPTH, mode=Mode.SUBTRACT)

    # LPattern1: Cut-Extrude3 ×2
    with Locations(*[(0, -i * LPATTERN1_PITCH, 0) for i in range(1, LPATTERN1_COUNT)]):
        add(cut_extrude3, mode=Mode.SUBTRACT)

    # Mirror1: Cut-Extrude3 across plane
    add(cut_extrude3.mirror(Plane(origin=(0, 0, 0), x_dir=(0, 0, 1), z_dir=(1, 0, 0))), mode=Mode.SUBTRACT)

    # Mirror1 copy 1 sketch → Mirror1 copy 1 (cut)
    with BuildSketch(Plane(origin=(28.575, -755.65, 0), x_dir=(0, 0, 1), z_dir=(1, 0, 0))):
        Polygon((3.175, -389.509), (3.175, -383.159), (-5.08, -383.159), (-10.16, -385.064), (-25.4, -385.064), (-25.4, -387.604), (-10.16, -387.604), (-5.08, -389.509), align=None)
        Polygon((3.175, -328.549), (3.175, -322.199), (-5.08, -322.199), (-10.16, -324.104), (-25.4, -324.104), (-25.4, -326.644), (-10.16, -326.644), (-5.08, -328.549), align=None)
    extrude(amount=-MIRROR1_COPY_1_DEPTH, mode=Mode.SUBTRACT)

    # Sketch15 → Cut-Extrude4 (cut, through all)
    with BuildSketch(Plane.ZY.offset(28.575)):
        with Locations((-19.05, 149.961528499)):
            Circle(SKETCH15_R)
    extrude(amount=-CUT_EXTRUDE4_DEPTH, mode=Mode.SUBTRACT)

    # 11/32 (0.34375) Diameter Hole1 (through all)
    with Locations(Plane.ZY.offset(28.575)):
        with Locations((-19.05, 410.201153152), (-19.05, 191.126153152)):
            Hole(F_11_32_0_34375_DIAMETER_HOLE1_D / 2)


solid = part.part
